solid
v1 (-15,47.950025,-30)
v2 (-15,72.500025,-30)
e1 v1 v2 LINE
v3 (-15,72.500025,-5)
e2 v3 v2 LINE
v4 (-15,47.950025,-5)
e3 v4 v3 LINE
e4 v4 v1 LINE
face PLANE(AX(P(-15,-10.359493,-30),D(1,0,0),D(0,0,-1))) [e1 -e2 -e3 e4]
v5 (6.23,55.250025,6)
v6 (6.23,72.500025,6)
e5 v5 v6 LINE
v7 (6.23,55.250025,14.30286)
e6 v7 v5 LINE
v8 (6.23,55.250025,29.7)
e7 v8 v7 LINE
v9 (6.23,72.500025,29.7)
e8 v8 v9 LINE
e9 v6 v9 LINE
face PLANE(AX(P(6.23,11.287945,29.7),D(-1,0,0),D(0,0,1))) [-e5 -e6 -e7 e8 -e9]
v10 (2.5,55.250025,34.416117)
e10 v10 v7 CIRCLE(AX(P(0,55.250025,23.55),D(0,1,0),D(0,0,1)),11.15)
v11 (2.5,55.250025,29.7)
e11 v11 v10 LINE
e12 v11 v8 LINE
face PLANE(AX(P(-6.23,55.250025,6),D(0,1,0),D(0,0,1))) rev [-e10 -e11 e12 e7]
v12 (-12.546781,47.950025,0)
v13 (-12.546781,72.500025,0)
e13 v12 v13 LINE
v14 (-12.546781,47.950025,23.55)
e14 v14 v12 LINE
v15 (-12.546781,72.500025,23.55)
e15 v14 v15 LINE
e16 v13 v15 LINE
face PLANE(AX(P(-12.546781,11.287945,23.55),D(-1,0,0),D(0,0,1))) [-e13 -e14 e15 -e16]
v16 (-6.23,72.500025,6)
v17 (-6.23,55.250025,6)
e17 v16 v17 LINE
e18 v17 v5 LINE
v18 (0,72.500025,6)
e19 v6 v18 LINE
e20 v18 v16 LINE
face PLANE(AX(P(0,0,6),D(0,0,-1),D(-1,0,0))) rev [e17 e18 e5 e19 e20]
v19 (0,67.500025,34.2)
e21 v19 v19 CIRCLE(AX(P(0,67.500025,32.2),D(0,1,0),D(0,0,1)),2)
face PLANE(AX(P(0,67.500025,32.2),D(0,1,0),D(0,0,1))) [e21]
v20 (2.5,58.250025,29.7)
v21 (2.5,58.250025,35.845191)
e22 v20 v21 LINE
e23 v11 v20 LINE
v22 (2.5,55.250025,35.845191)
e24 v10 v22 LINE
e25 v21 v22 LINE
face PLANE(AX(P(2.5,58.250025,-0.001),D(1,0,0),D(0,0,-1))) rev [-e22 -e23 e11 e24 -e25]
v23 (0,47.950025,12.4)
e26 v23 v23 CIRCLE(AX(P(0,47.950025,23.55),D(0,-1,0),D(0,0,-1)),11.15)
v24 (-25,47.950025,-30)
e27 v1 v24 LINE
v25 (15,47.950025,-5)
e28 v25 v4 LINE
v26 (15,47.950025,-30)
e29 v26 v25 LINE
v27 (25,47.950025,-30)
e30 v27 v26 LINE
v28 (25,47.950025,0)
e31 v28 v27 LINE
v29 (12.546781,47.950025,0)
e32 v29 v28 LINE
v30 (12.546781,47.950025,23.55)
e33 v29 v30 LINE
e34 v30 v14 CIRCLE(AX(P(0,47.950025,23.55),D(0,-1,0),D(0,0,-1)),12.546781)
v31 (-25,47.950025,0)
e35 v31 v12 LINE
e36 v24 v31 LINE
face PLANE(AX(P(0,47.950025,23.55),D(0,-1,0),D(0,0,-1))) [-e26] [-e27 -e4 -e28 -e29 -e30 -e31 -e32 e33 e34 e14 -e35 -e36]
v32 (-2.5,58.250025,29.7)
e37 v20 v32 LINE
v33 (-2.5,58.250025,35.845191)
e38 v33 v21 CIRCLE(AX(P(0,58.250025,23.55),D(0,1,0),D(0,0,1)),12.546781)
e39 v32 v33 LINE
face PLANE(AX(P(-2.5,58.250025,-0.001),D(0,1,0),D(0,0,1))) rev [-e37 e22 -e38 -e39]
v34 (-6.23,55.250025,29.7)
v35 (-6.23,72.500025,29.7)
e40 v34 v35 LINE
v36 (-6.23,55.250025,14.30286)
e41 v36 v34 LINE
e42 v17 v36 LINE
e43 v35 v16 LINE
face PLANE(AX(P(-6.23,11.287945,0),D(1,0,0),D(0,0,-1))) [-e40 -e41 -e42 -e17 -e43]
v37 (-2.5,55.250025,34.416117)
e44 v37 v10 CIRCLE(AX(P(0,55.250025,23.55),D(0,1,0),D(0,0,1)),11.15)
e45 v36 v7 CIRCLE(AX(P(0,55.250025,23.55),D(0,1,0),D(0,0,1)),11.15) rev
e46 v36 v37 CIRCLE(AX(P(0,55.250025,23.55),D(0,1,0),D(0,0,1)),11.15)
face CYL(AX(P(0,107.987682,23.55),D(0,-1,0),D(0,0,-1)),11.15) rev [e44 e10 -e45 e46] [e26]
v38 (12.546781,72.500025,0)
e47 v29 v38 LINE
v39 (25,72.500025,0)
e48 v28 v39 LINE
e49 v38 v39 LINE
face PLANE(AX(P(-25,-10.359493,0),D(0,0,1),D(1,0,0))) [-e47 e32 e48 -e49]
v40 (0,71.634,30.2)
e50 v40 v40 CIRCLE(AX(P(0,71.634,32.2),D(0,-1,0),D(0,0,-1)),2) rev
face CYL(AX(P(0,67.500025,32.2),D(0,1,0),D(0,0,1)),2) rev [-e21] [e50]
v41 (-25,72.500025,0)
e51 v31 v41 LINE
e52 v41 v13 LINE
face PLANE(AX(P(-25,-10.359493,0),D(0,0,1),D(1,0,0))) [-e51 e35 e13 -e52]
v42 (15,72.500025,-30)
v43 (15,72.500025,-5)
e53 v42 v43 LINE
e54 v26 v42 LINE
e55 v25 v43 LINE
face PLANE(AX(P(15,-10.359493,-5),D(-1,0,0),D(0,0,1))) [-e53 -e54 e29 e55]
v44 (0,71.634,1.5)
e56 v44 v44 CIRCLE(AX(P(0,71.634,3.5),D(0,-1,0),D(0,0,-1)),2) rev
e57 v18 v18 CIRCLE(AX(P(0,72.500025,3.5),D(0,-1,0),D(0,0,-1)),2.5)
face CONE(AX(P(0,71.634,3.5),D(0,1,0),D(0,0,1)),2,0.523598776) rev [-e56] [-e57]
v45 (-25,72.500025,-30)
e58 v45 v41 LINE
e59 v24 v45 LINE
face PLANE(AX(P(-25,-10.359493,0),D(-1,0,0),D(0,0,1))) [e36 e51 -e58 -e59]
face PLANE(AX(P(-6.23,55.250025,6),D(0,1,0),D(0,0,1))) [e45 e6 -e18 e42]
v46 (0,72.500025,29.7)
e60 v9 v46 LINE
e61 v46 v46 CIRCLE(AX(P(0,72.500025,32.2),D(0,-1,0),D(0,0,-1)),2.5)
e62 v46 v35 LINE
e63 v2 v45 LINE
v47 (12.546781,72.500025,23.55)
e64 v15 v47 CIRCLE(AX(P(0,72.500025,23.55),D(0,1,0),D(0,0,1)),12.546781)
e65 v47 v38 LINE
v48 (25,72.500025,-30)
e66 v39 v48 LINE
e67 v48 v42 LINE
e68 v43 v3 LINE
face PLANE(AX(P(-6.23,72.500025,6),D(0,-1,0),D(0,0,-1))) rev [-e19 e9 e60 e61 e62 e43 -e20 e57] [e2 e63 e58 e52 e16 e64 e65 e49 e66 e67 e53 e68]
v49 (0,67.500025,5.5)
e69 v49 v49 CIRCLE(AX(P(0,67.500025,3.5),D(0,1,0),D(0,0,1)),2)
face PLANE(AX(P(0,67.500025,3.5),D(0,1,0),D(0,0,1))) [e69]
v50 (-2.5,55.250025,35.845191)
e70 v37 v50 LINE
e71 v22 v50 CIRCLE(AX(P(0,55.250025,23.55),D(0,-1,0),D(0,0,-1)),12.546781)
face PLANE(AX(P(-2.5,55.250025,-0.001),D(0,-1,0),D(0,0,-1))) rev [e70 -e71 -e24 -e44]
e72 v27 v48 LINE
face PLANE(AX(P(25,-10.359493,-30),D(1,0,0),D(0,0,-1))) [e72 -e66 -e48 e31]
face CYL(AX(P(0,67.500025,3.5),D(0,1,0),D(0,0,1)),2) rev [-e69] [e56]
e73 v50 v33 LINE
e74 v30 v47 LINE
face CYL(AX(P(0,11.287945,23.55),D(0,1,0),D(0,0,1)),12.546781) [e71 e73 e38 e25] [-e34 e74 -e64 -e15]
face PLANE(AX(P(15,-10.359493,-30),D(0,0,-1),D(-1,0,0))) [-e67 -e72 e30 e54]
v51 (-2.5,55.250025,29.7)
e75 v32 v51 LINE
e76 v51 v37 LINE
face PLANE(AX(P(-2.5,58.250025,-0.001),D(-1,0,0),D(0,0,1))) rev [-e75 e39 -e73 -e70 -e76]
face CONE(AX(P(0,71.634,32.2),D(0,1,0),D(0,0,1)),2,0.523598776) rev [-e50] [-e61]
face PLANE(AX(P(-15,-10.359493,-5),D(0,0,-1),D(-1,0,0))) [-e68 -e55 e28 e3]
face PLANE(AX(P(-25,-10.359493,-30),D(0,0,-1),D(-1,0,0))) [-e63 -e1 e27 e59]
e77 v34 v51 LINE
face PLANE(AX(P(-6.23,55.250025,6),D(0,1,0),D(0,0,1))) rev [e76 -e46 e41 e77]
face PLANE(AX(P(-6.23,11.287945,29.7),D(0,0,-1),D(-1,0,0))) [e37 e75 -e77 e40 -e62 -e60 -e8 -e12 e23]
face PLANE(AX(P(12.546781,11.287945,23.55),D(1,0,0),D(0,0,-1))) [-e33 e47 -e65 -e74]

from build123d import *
from OCP.BRepFilletAPI import BRepFilletAPI_MakeChamfer

# Parameters (mm, degrees)
SKETCH4_W                = 12.46
SKETCH4_H                = 17.25
BOSS_EXTRUDE3_DEPTH      = 6
BOSS_EXTRUDE6_DEPTH      = 7.3
BOSS_EXTRUDE6_DEPTH_BACK = 17.25
SKETCH8_R                = 12.546781182
SKETCH8_R_2              = 11.15
BOSS_EXTRUDE4_DEPTH      = 17.25
SKETCH6_R                = 2
CUT_EXTRUDE1_DEPTH       = 5
CHAMFER1_SIZE            = 0.5
CHAMFER1_SIZE_2          = 0.866025404
SKETCH10_W               = 12.46
SKETCH10_H               = 23.7
CUT_EXTRUDE3_DEPTH       = 17.25
CUT_EXTRUDE4_REACH       = 83.955
SKETCH11_W               = 5
SKETCH11_H               = 3
BOSS_EXTRUDE7_START      = -7.3
BOSS_EXTRUDE7_DEPTH      = 7.3
BOSS_EXTRUDE8_DEPTH      = 24.55


with BuildPart() as part:
    # Sketch4 → Boss-Extrude3 (new body)
    with BuildSketch(Plane.XY):
        with Locations((0, 63.875025481)):
            Rectangle(SKETCH4_W, SKETCH4_H)
    extrude(amount=BOSS_EXTRUDE3_DEPTH)



with BuildPart() as body_2:
    # Sketch8 → Boss-Extrude6 (new, two sides: drawn at the far end of the back side and taken through both)
    with BuildSketch(Plane(origin=(0, 55.250025481, 0), x_dir=(-1, 0, 0), z_dir=(0, -1, 0)).offset(-BOSS_EXTRUDE6_DEPTH_BACK)):
        with Locations(Location((0, -23.55, 0), (0, 0, 90))):
            Circle(SKETCH8_R)
        with Locations(Location((0, -23.55, 0), (0, 0, 90))):
            Circle(SKETCH8_R_2, mode=Mode.SUBTRACT)
    extrude(amount=BOSS_EXTRUDE6_DEPTH + BOSS_EXTRUDE6_DEPTH_BACK)


with BuildPart() as part_1:
    add(part.part)

    add(body_2.part)  # Boss-Extrude4 merges body 2
    # Sketch5 → Boss-Extrude4 (add)
    with BuildSketch(Plane(origin=(0, 72.500025481, 0), x_dir=(1, 0, 0), z_dir=(0, 1, 0))):
        with BuildLine():
            Line((12.546781182, -23.55), (12.546781182, 0))
            Line((12.546781182, 0), (6.23, 0))
            Line((6.23, 0), (6.23, -29.7))
            Line((6.23, -29.7), (-6.23, -29.7))
            Line((-6.23, -29.7), (-6.23, 0))
            Line((-6.23, 0), (-12.546781182, 0))
            Line((-12.546781182, 0), (-12.546781182, -23.55))
            ThreePointArc((-12.546781182, -23.55), (0, -36.096781182), (12.546781182, -23.55))
        make_face()
    extrude(amount=-BOSS_EXTRUDE4_DEPTH)

    # Sketch6 → Cut-Extrude1 (cut)
    with BuildSketch(Plane(origin=(0, 72.500025481, 0), x_dir=(1, 0, 0), z_dir=(0, 1, 0))):
        with Locations(Location((0, -3.5, 0), (0, 0, 270))):
            Circle(SKETCH6_R)
        with Locations(Location((0, -32.2, 0), (0, 0, 270))):
            Circle(SKETCH6_R)
    extrude(amount=-CUT_EXTRUDE1_DEPTH, mode=Mode.SUBTRACT)

    # Chamfer1
    chamfer1_edges_1 = [part_1.edges().sort_by_distance(p)[0] for p in [
        (0, 72.500025481, 1.5),
    ]]
    chamfer1_side_1 = [part_1.faces().sort_by_distance(p)[0] for p in [
        (0, 72.500025481, 1.49),
    ]]
    chamfer1_edges_2 = [part_1.edges().sort_by_distance(p)[0] for p in [
        (0, 72.500025481, 30.2),
    ]]
    chamfer1_side_2 = [part_1.faces().sort_by_distance(p)[0] for p in [
        (0, 72.500025481, 30.19),
    ]]
    chamfer1 = BRepFilletAPI_MakeChamfer(part_1.part.solid().wrapped)
    for e in chamfer1_edges_1:
        chamfer1.Add(CHAMFER1_SIZE - 0.0001, CHAMFER1_SIZE_2 - 0.0001, e.wrapped, chamfer1_side_1[0].wrapped)
    for e in chamfer1_edges_2:
        chamfer1.Add(CHAMFER1_SIZE - 0.0001, CHAMFER1_SIZE_2 - 0.0001, e.wrapped, chamfer1_side_2[0].wrapped)
    add(Compound.cast(chamfer1.Shape()), mode=Mode.REPLACE)  # a hair under: the kernel refuses the full size

    # Sketch10 → Cut-Extrude3 (cut)
    with BuildSketch(Plane(origin=(0, 72.500025481, 0), x_dir=(1, 0, 0), z_dir=(0, 1, 0))):
        with Locations((0, -17.85)):
            Rectangle(SKETCH10_W, SKETCH10_H)
    extrude(amount=-CUT_EXTRUDE3_DEPTH, mode=Mode.SUBTRACT)

    # Sketch11 → Cut-Extrude4 (cut, up to next)
    with BuildSketch(Plane.XY.offset(36.096781182), mode=Mode.PRIVATE) as cut_extrude4_sk1:
        with Locations((0, 56.750025481)):
            Rectangle(SKETCH11_W, SKETCH11_H)
    cut_extrude4_tool1 = extrude(cut_extrude4_sk1.sketch, amount=-CUT_EXTRUDE4_REACH, mode=Mode.PRIVATE) & part_1.part
    add(cut_extrude4_tool1.solids().sort_by_distance((0, 56.750025, 36.096781))[0], mode=Mode.SUBTRACT)

    # Sketch13 → Boss-Extrude7 (add)
    with BuildSketch(Plane.XZ.offset(-47.950025481).offset(BOSS_EXTRUDE7_START)):
        with BuildLine():
            Line((-12.546781182, 23.55), (-12.546781182, 0))
            Line((-12.546781182, 0), (12.546781182, 0))
            Line((12.546781182, 0), (12.546781182, 23.55))
            ThreePointArc((12.546781182, 23.55), (0, 11.003218818), (-12.546781182, 23.55))
        make_face()
    extrude(amount=BOSS_EXTRUDE7_DEPTH)

    # Sketch14 → Boss-Extrude8 (add)
    with BuildSketch(Plane(origin=(0, 72.500025481, 0), x_dir=(1, 0, 0), z_dir=(0, 1, 0))):
        Polygon((-25, 0), (-25, 30), (-15, 30), (-15, 5), (15, 5), (15, 30), (25, 30), (25, 0), align=None)
    extrude(amount=-BOSS_EXTRUDE8_DEPTH)


solid = part_1.part
